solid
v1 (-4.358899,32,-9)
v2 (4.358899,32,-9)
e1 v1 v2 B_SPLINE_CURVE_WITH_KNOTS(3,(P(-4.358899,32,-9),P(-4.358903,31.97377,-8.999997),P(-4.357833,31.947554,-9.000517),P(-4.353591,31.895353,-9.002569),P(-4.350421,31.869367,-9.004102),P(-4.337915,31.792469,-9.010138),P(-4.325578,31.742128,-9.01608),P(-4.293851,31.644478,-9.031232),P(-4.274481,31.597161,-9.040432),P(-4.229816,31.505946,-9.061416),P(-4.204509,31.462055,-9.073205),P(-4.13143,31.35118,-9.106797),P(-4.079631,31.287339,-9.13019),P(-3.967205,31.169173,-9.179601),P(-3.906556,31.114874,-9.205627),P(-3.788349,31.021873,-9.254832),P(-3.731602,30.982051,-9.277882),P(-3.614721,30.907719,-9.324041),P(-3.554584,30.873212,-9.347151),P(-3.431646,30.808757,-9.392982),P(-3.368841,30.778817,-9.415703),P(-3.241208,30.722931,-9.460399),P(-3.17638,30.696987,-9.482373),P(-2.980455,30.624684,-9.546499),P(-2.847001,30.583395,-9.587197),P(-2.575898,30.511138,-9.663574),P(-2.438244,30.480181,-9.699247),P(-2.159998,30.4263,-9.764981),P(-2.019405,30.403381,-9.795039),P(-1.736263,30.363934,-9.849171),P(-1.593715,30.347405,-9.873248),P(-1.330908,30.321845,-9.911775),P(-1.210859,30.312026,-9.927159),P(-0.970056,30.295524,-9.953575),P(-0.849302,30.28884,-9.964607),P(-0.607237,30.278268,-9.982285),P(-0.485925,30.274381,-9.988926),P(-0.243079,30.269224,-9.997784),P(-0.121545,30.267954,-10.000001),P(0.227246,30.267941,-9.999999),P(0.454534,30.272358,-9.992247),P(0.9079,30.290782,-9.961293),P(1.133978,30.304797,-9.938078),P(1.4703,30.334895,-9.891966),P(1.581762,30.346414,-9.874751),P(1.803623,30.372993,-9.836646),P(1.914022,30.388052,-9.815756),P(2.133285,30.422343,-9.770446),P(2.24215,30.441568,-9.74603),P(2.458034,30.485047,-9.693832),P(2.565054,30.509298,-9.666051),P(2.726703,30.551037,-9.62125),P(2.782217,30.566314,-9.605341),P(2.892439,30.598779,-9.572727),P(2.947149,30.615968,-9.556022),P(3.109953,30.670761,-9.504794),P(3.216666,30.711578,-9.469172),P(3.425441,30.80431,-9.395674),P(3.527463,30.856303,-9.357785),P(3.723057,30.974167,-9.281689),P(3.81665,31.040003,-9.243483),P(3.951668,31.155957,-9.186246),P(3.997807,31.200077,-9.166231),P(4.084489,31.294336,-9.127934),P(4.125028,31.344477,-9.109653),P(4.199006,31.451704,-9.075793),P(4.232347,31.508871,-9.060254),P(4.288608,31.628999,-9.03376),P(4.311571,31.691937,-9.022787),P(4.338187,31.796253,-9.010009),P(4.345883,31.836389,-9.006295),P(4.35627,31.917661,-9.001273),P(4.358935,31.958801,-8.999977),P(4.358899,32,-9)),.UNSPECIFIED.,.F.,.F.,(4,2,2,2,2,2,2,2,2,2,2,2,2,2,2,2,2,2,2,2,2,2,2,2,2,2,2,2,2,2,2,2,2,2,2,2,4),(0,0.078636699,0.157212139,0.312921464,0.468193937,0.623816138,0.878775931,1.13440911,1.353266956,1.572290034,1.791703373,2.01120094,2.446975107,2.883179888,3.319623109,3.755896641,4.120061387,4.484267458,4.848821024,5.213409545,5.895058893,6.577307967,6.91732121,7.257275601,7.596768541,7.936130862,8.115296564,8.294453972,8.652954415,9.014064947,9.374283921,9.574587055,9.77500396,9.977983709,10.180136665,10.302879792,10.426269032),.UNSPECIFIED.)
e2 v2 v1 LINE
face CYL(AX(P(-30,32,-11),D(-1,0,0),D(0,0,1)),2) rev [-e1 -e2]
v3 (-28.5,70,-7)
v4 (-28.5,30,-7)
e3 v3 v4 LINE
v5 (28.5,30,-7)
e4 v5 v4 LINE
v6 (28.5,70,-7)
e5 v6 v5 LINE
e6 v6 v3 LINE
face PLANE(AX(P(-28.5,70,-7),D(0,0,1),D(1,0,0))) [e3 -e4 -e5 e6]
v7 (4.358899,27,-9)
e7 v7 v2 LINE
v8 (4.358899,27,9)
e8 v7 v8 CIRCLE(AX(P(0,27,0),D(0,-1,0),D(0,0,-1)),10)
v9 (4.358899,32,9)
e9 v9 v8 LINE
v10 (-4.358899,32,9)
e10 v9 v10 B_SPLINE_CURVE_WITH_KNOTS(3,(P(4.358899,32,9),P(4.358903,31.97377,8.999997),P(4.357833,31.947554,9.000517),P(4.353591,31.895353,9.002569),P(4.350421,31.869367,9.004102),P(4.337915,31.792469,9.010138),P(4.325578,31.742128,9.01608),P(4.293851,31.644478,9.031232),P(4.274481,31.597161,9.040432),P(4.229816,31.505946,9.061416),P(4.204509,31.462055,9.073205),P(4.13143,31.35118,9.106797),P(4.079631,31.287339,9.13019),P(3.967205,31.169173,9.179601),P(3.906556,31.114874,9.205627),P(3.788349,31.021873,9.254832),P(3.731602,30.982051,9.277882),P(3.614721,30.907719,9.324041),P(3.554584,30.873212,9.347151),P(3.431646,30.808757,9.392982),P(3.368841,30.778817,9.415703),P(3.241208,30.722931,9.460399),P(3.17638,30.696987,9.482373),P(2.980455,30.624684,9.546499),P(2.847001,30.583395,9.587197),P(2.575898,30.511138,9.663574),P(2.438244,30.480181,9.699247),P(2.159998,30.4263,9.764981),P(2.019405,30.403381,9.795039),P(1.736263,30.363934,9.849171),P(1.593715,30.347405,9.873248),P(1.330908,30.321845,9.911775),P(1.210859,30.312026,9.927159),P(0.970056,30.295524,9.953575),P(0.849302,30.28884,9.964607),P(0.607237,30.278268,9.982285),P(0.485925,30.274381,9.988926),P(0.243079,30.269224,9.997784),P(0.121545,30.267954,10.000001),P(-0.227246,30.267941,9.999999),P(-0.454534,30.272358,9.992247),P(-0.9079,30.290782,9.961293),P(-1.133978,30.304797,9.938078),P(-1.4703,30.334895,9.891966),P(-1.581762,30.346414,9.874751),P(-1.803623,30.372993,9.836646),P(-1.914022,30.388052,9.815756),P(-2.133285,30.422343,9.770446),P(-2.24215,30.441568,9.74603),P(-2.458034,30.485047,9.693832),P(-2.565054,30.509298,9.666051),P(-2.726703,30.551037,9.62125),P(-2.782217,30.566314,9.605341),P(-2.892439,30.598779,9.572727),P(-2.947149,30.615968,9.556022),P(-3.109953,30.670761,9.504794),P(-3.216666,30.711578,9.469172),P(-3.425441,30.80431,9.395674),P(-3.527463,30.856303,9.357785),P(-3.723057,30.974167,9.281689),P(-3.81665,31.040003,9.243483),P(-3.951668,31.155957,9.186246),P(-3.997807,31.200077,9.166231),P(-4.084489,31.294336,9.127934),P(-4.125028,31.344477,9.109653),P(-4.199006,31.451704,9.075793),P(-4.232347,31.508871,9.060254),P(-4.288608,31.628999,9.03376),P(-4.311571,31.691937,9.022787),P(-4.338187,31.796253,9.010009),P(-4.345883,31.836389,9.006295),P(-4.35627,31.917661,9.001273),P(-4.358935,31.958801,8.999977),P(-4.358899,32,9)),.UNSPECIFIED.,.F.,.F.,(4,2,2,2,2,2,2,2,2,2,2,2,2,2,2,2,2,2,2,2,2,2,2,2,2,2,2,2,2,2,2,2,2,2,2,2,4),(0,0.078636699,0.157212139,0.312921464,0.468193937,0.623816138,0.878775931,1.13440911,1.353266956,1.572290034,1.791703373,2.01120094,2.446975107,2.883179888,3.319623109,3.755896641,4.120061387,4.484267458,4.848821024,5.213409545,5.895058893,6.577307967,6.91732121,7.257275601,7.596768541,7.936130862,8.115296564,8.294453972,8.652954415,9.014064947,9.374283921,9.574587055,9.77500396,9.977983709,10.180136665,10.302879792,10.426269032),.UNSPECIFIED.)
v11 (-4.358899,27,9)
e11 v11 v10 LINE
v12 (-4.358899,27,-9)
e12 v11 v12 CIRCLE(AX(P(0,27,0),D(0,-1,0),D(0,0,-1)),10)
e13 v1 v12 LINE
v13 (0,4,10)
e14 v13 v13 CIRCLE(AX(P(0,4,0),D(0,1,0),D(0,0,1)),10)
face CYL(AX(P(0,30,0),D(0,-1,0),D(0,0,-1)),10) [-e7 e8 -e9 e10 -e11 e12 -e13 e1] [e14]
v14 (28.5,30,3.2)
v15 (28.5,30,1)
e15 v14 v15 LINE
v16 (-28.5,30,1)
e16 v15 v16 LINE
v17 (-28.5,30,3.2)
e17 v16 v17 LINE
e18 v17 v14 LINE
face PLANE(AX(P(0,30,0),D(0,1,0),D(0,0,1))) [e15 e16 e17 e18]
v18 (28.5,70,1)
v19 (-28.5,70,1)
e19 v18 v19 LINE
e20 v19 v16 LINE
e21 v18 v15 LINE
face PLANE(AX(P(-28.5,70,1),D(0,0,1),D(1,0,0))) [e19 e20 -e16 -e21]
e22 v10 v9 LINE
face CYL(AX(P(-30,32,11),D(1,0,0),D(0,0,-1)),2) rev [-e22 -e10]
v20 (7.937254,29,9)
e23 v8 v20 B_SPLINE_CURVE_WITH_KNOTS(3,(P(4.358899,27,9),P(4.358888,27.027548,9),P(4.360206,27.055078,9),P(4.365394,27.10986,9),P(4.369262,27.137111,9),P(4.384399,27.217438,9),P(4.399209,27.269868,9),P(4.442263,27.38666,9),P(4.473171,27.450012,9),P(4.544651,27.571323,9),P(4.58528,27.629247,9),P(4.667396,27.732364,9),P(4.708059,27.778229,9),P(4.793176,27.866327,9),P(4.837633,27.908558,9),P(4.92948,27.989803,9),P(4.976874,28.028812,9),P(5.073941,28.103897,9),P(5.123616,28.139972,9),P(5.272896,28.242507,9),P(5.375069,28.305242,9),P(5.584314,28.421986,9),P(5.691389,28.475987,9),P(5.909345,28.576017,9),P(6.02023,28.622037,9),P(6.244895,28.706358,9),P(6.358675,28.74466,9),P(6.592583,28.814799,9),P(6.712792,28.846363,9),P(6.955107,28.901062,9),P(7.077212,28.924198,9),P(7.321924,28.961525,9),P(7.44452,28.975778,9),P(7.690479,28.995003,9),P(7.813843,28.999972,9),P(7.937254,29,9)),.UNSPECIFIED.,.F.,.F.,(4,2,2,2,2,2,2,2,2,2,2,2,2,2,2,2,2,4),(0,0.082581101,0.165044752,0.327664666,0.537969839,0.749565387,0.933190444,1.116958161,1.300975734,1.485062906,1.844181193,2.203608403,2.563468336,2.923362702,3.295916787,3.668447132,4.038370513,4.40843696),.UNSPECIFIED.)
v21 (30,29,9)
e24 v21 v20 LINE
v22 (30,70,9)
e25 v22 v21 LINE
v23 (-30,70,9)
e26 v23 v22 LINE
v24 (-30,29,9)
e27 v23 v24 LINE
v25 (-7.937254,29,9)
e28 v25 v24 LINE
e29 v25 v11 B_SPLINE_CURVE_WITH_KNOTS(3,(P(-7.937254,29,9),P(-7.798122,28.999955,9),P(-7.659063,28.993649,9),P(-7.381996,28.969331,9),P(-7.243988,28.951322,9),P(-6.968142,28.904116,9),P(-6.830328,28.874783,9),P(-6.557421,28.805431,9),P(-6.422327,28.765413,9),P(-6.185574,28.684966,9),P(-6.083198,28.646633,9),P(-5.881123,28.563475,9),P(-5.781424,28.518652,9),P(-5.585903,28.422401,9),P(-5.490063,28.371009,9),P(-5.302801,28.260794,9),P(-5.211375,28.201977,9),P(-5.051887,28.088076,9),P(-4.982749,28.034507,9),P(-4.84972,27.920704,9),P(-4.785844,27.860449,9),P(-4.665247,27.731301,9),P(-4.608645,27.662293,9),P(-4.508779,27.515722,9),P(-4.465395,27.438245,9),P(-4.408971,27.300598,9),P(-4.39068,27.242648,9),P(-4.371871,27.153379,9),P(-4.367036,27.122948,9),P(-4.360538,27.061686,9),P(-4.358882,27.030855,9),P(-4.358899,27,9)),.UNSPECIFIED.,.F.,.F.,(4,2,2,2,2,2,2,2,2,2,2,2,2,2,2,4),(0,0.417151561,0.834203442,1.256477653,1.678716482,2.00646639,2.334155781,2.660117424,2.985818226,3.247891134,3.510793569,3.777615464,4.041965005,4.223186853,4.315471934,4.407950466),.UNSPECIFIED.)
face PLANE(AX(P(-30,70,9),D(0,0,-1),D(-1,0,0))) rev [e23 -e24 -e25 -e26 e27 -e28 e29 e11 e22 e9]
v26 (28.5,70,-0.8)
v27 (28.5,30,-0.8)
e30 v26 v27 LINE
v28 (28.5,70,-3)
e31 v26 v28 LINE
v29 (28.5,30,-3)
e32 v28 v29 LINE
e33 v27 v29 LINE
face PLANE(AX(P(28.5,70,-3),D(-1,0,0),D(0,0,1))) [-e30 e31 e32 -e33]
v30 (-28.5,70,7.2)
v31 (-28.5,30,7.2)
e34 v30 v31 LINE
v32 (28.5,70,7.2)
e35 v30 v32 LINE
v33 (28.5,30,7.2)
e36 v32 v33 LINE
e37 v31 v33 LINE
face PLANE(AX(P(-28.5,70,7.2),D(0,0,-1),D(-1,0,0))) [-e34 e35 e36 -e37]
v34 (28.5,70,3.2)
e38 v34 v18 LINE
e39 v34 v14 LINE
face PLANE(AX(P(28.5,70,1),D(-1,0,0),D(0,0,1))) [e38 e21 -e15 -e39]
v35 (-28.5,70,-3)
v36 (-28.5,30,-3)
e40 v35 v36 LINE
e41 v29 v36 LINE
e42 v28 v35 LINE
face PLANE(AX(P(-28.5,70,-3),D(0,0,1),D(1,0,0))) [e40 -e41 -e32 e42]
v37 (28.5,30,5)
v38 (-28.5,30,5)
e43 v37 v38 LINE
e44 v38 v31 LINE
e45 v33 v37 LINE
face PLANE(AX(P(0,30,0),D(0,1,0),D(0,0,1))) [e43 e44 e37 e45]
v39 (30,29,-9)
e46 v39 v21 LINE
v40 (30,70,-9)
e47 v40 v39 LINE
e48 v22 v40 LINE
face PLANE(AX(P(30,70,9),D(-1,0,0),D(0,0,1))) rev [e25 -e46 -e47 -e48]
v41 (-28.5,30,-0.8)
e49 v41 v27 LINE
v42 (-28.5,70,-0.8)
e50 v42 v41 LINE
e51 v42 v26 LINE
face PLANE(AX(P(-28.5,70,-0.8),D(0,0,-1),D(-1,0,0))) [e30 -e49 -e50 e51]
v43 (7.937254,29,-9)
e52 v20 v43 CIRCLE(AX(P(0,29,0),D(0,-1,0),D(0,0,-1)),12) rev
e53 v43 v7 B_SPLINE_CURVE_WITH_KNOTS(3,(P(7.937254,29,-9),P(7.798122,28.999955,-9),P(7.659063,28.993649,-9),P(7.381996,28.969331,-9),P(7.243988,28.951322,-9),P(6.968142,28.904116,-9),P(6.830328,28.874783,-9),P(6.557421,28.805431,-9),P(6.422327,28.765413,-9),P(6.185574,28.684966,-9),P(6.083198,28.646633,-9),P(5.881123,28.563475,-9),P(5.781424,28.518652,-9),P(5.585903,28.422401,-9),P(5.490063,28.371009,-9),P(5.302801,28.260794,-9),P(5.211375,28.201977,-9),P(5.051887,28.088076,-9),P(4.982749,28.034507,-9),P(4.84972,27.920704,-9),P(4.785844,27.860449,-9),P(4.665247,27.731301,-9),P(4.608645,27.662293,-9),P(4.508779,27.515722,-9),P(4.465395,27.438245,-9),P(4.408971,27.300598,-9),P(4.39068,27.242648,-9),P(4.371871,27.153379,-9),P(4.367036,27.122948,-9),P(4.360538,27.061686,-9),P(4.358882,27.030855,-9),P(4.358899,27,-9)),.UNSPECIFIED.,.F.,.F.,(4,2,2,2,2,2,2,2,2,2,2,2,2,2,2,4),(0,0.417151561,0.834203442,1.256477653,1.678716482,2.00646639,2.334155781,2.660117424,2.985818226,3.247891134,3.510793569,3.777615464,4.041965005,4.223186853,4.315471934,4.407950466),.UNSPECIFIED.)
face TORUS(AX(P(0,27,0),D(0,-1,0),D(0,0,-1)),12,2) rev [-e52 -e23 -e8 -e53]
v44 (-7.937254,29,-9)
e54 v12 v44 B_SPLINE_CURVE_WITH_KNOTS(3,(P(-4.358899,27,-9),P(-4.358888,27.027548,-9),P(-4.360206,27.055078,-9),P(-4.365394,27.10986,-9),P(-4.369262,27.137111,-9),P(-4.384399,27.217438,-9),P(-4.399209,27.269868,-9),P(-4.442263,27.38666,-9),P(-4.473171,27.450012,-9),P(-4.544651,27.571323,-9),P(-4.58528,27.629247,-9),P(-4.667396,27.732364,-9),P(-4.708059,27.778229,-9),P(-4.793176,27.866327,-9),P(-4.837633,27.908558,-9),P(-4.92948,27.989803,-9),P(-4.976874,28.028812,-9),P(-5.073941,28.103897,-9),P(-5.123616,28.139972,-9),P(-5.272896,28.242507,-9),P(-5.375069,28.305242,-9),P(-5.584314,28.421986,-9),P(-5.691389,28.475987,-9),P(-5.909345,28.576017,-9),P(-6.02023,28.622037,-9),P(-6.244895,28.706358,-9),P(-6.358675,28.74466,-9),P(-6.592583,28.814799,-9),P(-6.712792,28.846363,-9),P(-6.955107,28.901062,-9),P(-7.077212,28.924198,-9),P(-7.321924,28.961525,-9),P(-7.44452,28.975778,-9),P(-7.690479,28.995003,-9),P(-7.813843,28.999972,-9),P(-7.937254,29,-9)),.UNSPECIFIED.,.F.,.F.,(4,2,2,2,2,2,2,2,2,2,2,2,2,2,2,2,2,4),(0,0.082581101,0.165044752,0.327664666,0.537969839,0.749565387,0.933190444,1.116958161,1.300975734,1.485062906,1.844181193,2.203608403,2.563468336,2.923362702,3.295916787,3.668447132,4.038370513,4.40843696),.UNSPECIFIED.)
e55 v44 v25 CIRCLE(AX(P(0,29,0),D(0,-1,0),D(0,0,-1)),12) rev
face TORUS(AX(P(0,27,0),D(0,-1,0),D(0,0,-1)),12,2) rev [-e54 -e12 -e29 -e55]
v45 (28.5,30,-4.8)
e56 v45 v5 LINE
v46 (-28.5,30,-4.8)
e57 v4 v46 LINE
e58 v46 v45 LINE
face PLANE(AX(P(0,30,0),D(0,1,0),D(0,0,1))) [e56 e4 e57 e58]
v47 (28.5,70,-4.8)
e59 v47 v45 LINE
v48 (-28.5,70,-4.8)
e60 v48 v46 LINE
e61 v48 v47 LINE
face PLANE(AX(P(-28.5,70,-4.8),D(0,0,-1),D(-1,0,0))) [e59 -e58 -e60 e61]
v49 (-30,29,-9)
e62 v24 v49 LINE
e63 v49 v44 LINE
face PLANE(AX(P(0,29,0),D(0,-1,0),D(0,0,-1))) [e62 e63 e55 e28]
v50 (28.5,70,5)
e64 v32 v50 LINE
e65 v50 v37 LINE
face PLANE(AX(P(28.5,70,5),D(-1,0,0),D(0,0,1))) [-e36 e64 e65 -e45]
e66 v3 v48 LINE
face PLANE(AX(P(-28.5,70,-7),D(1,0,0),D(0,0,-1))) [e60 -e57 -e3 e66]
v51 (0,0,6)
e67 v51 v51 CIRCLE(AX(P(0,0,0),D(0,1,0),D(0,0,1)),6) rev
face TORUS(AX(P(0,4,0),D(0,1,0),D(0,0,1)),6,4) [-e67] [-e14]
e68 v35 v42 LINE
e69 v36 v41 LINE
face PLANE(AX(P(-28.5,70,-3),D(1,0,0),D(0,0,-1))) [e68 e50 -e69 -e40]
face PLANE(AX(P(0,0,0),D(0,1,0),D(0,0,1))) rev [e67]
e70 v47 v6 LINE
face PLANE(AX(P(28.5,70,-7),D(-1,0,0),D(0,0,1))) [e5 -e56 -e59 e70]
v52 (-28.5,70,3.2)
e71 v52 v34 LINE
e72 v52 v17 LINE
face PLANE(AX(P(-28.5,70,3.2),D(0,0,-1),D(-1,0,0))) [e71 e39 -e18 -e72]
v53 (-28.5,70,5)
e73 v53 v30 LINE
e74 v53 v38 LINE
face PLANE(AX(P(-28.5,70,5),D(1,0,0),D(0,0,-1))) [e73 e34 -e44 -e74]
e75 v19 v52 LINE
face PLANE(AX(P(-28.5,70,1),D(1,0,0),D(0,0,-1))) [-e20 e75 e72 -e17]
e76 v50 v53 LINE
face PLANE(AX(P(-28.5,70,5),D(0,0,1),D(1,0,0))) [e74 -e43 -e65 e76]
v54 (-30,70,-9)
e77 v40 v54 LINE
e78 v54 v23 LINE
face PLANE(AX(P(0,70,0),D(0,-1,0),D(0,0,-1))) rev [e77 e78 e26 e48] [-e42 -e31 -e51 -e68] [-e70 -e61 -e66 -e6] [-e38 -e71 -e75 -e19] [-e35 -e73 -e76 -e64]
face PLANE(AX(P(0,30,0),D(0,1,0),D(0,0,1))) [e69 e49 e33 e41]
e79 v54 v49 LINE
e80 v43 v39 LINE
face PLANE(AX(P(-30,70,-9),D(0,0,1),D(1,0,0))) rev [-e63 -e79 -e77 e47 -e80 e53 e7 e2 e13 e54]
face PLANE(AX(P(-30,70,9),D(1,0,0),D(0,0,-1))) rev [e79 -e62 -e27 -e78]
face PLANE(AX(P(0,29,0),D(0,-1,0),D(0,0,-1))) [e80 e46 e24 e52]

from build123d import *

# Parameters (mm, degrees)
SKETCH1_R           = 10
BOSS_EXTRUDE1_DEPTH = 30
FILLET1_R           = 4
SKETCH2_W           = 60
SKETCH2_H           = 18
SKETCH2_W_2         = 57
SKETCH2_H_2         = 2.2
BOSS_EXTRUDE2_DEPTH = 40
SKETCH3_W           = 60
SKETCH3_H           = 18
BOSS_EXTRUDE3_DEPTH = 1
FILLET2_R           = 2
FILLET3_R           = 2


with BuildPart() as part:
    # Sketch1 → Boss-Extrude1 (new body)
    with BuildSketch(Plane(origin=(0, 0, 0), x_dir=(1, 0, 0), z_dir=(0, 1, 0))):
        with Locations(Location((0, 0, 0), (0, 0, 270))):
            Circle(SKETCH1_R)
    extrude(amount=BOSS_EXTRUDE1_DEPTH)

    # Fillet1
    fillet1_edges = [part.edges().sort_by_distance(p)[0] for p in [
        (0, 0, -10),
    ]]
    fillet(fillet1_edges, radius=FILLET1_R)

    # Sketch2 → Boss-Extrude2 (add)
    with BuildSketch(Plane(origin=(0, 30, 0), x_dir=(1, 0, 0), z_dir=(0, 1, 0))):
        Rectangle(SKETCH2_W, SKETCH2_H)
        with Locations((0, 1.9)):
            Rectangle(SKETCH2_W_2, SKETCH2_H_2, mode=Mode.SUBTRACT)
        with Locations((0, 5.9)):
            Rectangle(SKETCH2_W_2, SKETCH2_H_2, mode=Mode.SUBTRACT)
        with Locations((0, -2.1)):
            Rectangle(SKETCH2_W_2, SKETCH2_H_2, mode=Mode.SUBTRACT)
        with Locations((0, -6.1)):
            Rectangle(SKETCH2_W_2, SKETCH2_H_2, mode=Mode.SUBTRACT)
    extrude(amount=BOSS_EXTRUDE2_DEPTH)

    # Sketch3 → Boss-Extrude3 (add)
    with BuildSketch(Plane.XZ.offset(-30)):
        Rectangle(SKETCH3_W, SKETCH3_H)
    extrude(amount=BOSS_EXTRUDE3_DEPTH)

    # Fillet2
    fillet2_edges = [part.edges().sort_by_distance(p)[0] for p in [
        (-10, 29, 0),
        (10, 29, 0),
    ]]
    fillet(fillet2_edges, radius=FILLET2_R)

    # Fillet3
    # the kernel refuses this fillet: 2 mm, written as the material it adds along each edge
    with BuildSketch(Plane(origin=(-9.358898944, 30, 9), x_dir=(0, 0, 1), z_dir=(1, 0, 0))) as fillet3_piece_1_section:
        with BuildLine():
            CenterArc((FILLET3_R, -FILLET3_R), FILLET3_R, 90, 90)
            Line((0, -FILLET3_R), (0, 0))
            Line((0, 0), (FILLET3_R, 0))
        make_face()
    fillet3_piece_1 = extrude(amount=18.717797887, mode=Mode.PRIVATE)
    fillet3_piece_1 = fillet3_piece_1 & Plane(origin=(0, 30.566631584, 0), x_dir=(0, 0, 1), z_dir=(0, -1, 0)) * Cylinder(10, 46, mode=Mode.PRIVATE)
    add(fillet3_piece_1)
    with BuildSketch(Plane(origin=(9.358898944, 30, -9), x_dir=(0, 0, -1), z_dir=(-1, 0, 0))) as fillet3_piece_2_section:
        with BuildLine():
            CenterArc((FILLET3_R, -FILLET3_R), FILLET3_R, 90, 90)
            Line((0, -FILLET3_R), (0, 0))
            Line((0, 0), (FILLET3_R, 0))
        make_face()
    fillet3_piece_2 = extrude(amount=18.717797887, mode=Mode.PRIVATE)
    fillet3_piece_2 = fillet3_piece_2 & Plane(origin=(0, 30.566641093, 0), x_dir=(0, 0, 1), z_dir=(0, -1, 0)) * Cylinder(10, 46, mode=Mode.PRIVATE)
    add(fillet3_piece_2)


solid = part.part
